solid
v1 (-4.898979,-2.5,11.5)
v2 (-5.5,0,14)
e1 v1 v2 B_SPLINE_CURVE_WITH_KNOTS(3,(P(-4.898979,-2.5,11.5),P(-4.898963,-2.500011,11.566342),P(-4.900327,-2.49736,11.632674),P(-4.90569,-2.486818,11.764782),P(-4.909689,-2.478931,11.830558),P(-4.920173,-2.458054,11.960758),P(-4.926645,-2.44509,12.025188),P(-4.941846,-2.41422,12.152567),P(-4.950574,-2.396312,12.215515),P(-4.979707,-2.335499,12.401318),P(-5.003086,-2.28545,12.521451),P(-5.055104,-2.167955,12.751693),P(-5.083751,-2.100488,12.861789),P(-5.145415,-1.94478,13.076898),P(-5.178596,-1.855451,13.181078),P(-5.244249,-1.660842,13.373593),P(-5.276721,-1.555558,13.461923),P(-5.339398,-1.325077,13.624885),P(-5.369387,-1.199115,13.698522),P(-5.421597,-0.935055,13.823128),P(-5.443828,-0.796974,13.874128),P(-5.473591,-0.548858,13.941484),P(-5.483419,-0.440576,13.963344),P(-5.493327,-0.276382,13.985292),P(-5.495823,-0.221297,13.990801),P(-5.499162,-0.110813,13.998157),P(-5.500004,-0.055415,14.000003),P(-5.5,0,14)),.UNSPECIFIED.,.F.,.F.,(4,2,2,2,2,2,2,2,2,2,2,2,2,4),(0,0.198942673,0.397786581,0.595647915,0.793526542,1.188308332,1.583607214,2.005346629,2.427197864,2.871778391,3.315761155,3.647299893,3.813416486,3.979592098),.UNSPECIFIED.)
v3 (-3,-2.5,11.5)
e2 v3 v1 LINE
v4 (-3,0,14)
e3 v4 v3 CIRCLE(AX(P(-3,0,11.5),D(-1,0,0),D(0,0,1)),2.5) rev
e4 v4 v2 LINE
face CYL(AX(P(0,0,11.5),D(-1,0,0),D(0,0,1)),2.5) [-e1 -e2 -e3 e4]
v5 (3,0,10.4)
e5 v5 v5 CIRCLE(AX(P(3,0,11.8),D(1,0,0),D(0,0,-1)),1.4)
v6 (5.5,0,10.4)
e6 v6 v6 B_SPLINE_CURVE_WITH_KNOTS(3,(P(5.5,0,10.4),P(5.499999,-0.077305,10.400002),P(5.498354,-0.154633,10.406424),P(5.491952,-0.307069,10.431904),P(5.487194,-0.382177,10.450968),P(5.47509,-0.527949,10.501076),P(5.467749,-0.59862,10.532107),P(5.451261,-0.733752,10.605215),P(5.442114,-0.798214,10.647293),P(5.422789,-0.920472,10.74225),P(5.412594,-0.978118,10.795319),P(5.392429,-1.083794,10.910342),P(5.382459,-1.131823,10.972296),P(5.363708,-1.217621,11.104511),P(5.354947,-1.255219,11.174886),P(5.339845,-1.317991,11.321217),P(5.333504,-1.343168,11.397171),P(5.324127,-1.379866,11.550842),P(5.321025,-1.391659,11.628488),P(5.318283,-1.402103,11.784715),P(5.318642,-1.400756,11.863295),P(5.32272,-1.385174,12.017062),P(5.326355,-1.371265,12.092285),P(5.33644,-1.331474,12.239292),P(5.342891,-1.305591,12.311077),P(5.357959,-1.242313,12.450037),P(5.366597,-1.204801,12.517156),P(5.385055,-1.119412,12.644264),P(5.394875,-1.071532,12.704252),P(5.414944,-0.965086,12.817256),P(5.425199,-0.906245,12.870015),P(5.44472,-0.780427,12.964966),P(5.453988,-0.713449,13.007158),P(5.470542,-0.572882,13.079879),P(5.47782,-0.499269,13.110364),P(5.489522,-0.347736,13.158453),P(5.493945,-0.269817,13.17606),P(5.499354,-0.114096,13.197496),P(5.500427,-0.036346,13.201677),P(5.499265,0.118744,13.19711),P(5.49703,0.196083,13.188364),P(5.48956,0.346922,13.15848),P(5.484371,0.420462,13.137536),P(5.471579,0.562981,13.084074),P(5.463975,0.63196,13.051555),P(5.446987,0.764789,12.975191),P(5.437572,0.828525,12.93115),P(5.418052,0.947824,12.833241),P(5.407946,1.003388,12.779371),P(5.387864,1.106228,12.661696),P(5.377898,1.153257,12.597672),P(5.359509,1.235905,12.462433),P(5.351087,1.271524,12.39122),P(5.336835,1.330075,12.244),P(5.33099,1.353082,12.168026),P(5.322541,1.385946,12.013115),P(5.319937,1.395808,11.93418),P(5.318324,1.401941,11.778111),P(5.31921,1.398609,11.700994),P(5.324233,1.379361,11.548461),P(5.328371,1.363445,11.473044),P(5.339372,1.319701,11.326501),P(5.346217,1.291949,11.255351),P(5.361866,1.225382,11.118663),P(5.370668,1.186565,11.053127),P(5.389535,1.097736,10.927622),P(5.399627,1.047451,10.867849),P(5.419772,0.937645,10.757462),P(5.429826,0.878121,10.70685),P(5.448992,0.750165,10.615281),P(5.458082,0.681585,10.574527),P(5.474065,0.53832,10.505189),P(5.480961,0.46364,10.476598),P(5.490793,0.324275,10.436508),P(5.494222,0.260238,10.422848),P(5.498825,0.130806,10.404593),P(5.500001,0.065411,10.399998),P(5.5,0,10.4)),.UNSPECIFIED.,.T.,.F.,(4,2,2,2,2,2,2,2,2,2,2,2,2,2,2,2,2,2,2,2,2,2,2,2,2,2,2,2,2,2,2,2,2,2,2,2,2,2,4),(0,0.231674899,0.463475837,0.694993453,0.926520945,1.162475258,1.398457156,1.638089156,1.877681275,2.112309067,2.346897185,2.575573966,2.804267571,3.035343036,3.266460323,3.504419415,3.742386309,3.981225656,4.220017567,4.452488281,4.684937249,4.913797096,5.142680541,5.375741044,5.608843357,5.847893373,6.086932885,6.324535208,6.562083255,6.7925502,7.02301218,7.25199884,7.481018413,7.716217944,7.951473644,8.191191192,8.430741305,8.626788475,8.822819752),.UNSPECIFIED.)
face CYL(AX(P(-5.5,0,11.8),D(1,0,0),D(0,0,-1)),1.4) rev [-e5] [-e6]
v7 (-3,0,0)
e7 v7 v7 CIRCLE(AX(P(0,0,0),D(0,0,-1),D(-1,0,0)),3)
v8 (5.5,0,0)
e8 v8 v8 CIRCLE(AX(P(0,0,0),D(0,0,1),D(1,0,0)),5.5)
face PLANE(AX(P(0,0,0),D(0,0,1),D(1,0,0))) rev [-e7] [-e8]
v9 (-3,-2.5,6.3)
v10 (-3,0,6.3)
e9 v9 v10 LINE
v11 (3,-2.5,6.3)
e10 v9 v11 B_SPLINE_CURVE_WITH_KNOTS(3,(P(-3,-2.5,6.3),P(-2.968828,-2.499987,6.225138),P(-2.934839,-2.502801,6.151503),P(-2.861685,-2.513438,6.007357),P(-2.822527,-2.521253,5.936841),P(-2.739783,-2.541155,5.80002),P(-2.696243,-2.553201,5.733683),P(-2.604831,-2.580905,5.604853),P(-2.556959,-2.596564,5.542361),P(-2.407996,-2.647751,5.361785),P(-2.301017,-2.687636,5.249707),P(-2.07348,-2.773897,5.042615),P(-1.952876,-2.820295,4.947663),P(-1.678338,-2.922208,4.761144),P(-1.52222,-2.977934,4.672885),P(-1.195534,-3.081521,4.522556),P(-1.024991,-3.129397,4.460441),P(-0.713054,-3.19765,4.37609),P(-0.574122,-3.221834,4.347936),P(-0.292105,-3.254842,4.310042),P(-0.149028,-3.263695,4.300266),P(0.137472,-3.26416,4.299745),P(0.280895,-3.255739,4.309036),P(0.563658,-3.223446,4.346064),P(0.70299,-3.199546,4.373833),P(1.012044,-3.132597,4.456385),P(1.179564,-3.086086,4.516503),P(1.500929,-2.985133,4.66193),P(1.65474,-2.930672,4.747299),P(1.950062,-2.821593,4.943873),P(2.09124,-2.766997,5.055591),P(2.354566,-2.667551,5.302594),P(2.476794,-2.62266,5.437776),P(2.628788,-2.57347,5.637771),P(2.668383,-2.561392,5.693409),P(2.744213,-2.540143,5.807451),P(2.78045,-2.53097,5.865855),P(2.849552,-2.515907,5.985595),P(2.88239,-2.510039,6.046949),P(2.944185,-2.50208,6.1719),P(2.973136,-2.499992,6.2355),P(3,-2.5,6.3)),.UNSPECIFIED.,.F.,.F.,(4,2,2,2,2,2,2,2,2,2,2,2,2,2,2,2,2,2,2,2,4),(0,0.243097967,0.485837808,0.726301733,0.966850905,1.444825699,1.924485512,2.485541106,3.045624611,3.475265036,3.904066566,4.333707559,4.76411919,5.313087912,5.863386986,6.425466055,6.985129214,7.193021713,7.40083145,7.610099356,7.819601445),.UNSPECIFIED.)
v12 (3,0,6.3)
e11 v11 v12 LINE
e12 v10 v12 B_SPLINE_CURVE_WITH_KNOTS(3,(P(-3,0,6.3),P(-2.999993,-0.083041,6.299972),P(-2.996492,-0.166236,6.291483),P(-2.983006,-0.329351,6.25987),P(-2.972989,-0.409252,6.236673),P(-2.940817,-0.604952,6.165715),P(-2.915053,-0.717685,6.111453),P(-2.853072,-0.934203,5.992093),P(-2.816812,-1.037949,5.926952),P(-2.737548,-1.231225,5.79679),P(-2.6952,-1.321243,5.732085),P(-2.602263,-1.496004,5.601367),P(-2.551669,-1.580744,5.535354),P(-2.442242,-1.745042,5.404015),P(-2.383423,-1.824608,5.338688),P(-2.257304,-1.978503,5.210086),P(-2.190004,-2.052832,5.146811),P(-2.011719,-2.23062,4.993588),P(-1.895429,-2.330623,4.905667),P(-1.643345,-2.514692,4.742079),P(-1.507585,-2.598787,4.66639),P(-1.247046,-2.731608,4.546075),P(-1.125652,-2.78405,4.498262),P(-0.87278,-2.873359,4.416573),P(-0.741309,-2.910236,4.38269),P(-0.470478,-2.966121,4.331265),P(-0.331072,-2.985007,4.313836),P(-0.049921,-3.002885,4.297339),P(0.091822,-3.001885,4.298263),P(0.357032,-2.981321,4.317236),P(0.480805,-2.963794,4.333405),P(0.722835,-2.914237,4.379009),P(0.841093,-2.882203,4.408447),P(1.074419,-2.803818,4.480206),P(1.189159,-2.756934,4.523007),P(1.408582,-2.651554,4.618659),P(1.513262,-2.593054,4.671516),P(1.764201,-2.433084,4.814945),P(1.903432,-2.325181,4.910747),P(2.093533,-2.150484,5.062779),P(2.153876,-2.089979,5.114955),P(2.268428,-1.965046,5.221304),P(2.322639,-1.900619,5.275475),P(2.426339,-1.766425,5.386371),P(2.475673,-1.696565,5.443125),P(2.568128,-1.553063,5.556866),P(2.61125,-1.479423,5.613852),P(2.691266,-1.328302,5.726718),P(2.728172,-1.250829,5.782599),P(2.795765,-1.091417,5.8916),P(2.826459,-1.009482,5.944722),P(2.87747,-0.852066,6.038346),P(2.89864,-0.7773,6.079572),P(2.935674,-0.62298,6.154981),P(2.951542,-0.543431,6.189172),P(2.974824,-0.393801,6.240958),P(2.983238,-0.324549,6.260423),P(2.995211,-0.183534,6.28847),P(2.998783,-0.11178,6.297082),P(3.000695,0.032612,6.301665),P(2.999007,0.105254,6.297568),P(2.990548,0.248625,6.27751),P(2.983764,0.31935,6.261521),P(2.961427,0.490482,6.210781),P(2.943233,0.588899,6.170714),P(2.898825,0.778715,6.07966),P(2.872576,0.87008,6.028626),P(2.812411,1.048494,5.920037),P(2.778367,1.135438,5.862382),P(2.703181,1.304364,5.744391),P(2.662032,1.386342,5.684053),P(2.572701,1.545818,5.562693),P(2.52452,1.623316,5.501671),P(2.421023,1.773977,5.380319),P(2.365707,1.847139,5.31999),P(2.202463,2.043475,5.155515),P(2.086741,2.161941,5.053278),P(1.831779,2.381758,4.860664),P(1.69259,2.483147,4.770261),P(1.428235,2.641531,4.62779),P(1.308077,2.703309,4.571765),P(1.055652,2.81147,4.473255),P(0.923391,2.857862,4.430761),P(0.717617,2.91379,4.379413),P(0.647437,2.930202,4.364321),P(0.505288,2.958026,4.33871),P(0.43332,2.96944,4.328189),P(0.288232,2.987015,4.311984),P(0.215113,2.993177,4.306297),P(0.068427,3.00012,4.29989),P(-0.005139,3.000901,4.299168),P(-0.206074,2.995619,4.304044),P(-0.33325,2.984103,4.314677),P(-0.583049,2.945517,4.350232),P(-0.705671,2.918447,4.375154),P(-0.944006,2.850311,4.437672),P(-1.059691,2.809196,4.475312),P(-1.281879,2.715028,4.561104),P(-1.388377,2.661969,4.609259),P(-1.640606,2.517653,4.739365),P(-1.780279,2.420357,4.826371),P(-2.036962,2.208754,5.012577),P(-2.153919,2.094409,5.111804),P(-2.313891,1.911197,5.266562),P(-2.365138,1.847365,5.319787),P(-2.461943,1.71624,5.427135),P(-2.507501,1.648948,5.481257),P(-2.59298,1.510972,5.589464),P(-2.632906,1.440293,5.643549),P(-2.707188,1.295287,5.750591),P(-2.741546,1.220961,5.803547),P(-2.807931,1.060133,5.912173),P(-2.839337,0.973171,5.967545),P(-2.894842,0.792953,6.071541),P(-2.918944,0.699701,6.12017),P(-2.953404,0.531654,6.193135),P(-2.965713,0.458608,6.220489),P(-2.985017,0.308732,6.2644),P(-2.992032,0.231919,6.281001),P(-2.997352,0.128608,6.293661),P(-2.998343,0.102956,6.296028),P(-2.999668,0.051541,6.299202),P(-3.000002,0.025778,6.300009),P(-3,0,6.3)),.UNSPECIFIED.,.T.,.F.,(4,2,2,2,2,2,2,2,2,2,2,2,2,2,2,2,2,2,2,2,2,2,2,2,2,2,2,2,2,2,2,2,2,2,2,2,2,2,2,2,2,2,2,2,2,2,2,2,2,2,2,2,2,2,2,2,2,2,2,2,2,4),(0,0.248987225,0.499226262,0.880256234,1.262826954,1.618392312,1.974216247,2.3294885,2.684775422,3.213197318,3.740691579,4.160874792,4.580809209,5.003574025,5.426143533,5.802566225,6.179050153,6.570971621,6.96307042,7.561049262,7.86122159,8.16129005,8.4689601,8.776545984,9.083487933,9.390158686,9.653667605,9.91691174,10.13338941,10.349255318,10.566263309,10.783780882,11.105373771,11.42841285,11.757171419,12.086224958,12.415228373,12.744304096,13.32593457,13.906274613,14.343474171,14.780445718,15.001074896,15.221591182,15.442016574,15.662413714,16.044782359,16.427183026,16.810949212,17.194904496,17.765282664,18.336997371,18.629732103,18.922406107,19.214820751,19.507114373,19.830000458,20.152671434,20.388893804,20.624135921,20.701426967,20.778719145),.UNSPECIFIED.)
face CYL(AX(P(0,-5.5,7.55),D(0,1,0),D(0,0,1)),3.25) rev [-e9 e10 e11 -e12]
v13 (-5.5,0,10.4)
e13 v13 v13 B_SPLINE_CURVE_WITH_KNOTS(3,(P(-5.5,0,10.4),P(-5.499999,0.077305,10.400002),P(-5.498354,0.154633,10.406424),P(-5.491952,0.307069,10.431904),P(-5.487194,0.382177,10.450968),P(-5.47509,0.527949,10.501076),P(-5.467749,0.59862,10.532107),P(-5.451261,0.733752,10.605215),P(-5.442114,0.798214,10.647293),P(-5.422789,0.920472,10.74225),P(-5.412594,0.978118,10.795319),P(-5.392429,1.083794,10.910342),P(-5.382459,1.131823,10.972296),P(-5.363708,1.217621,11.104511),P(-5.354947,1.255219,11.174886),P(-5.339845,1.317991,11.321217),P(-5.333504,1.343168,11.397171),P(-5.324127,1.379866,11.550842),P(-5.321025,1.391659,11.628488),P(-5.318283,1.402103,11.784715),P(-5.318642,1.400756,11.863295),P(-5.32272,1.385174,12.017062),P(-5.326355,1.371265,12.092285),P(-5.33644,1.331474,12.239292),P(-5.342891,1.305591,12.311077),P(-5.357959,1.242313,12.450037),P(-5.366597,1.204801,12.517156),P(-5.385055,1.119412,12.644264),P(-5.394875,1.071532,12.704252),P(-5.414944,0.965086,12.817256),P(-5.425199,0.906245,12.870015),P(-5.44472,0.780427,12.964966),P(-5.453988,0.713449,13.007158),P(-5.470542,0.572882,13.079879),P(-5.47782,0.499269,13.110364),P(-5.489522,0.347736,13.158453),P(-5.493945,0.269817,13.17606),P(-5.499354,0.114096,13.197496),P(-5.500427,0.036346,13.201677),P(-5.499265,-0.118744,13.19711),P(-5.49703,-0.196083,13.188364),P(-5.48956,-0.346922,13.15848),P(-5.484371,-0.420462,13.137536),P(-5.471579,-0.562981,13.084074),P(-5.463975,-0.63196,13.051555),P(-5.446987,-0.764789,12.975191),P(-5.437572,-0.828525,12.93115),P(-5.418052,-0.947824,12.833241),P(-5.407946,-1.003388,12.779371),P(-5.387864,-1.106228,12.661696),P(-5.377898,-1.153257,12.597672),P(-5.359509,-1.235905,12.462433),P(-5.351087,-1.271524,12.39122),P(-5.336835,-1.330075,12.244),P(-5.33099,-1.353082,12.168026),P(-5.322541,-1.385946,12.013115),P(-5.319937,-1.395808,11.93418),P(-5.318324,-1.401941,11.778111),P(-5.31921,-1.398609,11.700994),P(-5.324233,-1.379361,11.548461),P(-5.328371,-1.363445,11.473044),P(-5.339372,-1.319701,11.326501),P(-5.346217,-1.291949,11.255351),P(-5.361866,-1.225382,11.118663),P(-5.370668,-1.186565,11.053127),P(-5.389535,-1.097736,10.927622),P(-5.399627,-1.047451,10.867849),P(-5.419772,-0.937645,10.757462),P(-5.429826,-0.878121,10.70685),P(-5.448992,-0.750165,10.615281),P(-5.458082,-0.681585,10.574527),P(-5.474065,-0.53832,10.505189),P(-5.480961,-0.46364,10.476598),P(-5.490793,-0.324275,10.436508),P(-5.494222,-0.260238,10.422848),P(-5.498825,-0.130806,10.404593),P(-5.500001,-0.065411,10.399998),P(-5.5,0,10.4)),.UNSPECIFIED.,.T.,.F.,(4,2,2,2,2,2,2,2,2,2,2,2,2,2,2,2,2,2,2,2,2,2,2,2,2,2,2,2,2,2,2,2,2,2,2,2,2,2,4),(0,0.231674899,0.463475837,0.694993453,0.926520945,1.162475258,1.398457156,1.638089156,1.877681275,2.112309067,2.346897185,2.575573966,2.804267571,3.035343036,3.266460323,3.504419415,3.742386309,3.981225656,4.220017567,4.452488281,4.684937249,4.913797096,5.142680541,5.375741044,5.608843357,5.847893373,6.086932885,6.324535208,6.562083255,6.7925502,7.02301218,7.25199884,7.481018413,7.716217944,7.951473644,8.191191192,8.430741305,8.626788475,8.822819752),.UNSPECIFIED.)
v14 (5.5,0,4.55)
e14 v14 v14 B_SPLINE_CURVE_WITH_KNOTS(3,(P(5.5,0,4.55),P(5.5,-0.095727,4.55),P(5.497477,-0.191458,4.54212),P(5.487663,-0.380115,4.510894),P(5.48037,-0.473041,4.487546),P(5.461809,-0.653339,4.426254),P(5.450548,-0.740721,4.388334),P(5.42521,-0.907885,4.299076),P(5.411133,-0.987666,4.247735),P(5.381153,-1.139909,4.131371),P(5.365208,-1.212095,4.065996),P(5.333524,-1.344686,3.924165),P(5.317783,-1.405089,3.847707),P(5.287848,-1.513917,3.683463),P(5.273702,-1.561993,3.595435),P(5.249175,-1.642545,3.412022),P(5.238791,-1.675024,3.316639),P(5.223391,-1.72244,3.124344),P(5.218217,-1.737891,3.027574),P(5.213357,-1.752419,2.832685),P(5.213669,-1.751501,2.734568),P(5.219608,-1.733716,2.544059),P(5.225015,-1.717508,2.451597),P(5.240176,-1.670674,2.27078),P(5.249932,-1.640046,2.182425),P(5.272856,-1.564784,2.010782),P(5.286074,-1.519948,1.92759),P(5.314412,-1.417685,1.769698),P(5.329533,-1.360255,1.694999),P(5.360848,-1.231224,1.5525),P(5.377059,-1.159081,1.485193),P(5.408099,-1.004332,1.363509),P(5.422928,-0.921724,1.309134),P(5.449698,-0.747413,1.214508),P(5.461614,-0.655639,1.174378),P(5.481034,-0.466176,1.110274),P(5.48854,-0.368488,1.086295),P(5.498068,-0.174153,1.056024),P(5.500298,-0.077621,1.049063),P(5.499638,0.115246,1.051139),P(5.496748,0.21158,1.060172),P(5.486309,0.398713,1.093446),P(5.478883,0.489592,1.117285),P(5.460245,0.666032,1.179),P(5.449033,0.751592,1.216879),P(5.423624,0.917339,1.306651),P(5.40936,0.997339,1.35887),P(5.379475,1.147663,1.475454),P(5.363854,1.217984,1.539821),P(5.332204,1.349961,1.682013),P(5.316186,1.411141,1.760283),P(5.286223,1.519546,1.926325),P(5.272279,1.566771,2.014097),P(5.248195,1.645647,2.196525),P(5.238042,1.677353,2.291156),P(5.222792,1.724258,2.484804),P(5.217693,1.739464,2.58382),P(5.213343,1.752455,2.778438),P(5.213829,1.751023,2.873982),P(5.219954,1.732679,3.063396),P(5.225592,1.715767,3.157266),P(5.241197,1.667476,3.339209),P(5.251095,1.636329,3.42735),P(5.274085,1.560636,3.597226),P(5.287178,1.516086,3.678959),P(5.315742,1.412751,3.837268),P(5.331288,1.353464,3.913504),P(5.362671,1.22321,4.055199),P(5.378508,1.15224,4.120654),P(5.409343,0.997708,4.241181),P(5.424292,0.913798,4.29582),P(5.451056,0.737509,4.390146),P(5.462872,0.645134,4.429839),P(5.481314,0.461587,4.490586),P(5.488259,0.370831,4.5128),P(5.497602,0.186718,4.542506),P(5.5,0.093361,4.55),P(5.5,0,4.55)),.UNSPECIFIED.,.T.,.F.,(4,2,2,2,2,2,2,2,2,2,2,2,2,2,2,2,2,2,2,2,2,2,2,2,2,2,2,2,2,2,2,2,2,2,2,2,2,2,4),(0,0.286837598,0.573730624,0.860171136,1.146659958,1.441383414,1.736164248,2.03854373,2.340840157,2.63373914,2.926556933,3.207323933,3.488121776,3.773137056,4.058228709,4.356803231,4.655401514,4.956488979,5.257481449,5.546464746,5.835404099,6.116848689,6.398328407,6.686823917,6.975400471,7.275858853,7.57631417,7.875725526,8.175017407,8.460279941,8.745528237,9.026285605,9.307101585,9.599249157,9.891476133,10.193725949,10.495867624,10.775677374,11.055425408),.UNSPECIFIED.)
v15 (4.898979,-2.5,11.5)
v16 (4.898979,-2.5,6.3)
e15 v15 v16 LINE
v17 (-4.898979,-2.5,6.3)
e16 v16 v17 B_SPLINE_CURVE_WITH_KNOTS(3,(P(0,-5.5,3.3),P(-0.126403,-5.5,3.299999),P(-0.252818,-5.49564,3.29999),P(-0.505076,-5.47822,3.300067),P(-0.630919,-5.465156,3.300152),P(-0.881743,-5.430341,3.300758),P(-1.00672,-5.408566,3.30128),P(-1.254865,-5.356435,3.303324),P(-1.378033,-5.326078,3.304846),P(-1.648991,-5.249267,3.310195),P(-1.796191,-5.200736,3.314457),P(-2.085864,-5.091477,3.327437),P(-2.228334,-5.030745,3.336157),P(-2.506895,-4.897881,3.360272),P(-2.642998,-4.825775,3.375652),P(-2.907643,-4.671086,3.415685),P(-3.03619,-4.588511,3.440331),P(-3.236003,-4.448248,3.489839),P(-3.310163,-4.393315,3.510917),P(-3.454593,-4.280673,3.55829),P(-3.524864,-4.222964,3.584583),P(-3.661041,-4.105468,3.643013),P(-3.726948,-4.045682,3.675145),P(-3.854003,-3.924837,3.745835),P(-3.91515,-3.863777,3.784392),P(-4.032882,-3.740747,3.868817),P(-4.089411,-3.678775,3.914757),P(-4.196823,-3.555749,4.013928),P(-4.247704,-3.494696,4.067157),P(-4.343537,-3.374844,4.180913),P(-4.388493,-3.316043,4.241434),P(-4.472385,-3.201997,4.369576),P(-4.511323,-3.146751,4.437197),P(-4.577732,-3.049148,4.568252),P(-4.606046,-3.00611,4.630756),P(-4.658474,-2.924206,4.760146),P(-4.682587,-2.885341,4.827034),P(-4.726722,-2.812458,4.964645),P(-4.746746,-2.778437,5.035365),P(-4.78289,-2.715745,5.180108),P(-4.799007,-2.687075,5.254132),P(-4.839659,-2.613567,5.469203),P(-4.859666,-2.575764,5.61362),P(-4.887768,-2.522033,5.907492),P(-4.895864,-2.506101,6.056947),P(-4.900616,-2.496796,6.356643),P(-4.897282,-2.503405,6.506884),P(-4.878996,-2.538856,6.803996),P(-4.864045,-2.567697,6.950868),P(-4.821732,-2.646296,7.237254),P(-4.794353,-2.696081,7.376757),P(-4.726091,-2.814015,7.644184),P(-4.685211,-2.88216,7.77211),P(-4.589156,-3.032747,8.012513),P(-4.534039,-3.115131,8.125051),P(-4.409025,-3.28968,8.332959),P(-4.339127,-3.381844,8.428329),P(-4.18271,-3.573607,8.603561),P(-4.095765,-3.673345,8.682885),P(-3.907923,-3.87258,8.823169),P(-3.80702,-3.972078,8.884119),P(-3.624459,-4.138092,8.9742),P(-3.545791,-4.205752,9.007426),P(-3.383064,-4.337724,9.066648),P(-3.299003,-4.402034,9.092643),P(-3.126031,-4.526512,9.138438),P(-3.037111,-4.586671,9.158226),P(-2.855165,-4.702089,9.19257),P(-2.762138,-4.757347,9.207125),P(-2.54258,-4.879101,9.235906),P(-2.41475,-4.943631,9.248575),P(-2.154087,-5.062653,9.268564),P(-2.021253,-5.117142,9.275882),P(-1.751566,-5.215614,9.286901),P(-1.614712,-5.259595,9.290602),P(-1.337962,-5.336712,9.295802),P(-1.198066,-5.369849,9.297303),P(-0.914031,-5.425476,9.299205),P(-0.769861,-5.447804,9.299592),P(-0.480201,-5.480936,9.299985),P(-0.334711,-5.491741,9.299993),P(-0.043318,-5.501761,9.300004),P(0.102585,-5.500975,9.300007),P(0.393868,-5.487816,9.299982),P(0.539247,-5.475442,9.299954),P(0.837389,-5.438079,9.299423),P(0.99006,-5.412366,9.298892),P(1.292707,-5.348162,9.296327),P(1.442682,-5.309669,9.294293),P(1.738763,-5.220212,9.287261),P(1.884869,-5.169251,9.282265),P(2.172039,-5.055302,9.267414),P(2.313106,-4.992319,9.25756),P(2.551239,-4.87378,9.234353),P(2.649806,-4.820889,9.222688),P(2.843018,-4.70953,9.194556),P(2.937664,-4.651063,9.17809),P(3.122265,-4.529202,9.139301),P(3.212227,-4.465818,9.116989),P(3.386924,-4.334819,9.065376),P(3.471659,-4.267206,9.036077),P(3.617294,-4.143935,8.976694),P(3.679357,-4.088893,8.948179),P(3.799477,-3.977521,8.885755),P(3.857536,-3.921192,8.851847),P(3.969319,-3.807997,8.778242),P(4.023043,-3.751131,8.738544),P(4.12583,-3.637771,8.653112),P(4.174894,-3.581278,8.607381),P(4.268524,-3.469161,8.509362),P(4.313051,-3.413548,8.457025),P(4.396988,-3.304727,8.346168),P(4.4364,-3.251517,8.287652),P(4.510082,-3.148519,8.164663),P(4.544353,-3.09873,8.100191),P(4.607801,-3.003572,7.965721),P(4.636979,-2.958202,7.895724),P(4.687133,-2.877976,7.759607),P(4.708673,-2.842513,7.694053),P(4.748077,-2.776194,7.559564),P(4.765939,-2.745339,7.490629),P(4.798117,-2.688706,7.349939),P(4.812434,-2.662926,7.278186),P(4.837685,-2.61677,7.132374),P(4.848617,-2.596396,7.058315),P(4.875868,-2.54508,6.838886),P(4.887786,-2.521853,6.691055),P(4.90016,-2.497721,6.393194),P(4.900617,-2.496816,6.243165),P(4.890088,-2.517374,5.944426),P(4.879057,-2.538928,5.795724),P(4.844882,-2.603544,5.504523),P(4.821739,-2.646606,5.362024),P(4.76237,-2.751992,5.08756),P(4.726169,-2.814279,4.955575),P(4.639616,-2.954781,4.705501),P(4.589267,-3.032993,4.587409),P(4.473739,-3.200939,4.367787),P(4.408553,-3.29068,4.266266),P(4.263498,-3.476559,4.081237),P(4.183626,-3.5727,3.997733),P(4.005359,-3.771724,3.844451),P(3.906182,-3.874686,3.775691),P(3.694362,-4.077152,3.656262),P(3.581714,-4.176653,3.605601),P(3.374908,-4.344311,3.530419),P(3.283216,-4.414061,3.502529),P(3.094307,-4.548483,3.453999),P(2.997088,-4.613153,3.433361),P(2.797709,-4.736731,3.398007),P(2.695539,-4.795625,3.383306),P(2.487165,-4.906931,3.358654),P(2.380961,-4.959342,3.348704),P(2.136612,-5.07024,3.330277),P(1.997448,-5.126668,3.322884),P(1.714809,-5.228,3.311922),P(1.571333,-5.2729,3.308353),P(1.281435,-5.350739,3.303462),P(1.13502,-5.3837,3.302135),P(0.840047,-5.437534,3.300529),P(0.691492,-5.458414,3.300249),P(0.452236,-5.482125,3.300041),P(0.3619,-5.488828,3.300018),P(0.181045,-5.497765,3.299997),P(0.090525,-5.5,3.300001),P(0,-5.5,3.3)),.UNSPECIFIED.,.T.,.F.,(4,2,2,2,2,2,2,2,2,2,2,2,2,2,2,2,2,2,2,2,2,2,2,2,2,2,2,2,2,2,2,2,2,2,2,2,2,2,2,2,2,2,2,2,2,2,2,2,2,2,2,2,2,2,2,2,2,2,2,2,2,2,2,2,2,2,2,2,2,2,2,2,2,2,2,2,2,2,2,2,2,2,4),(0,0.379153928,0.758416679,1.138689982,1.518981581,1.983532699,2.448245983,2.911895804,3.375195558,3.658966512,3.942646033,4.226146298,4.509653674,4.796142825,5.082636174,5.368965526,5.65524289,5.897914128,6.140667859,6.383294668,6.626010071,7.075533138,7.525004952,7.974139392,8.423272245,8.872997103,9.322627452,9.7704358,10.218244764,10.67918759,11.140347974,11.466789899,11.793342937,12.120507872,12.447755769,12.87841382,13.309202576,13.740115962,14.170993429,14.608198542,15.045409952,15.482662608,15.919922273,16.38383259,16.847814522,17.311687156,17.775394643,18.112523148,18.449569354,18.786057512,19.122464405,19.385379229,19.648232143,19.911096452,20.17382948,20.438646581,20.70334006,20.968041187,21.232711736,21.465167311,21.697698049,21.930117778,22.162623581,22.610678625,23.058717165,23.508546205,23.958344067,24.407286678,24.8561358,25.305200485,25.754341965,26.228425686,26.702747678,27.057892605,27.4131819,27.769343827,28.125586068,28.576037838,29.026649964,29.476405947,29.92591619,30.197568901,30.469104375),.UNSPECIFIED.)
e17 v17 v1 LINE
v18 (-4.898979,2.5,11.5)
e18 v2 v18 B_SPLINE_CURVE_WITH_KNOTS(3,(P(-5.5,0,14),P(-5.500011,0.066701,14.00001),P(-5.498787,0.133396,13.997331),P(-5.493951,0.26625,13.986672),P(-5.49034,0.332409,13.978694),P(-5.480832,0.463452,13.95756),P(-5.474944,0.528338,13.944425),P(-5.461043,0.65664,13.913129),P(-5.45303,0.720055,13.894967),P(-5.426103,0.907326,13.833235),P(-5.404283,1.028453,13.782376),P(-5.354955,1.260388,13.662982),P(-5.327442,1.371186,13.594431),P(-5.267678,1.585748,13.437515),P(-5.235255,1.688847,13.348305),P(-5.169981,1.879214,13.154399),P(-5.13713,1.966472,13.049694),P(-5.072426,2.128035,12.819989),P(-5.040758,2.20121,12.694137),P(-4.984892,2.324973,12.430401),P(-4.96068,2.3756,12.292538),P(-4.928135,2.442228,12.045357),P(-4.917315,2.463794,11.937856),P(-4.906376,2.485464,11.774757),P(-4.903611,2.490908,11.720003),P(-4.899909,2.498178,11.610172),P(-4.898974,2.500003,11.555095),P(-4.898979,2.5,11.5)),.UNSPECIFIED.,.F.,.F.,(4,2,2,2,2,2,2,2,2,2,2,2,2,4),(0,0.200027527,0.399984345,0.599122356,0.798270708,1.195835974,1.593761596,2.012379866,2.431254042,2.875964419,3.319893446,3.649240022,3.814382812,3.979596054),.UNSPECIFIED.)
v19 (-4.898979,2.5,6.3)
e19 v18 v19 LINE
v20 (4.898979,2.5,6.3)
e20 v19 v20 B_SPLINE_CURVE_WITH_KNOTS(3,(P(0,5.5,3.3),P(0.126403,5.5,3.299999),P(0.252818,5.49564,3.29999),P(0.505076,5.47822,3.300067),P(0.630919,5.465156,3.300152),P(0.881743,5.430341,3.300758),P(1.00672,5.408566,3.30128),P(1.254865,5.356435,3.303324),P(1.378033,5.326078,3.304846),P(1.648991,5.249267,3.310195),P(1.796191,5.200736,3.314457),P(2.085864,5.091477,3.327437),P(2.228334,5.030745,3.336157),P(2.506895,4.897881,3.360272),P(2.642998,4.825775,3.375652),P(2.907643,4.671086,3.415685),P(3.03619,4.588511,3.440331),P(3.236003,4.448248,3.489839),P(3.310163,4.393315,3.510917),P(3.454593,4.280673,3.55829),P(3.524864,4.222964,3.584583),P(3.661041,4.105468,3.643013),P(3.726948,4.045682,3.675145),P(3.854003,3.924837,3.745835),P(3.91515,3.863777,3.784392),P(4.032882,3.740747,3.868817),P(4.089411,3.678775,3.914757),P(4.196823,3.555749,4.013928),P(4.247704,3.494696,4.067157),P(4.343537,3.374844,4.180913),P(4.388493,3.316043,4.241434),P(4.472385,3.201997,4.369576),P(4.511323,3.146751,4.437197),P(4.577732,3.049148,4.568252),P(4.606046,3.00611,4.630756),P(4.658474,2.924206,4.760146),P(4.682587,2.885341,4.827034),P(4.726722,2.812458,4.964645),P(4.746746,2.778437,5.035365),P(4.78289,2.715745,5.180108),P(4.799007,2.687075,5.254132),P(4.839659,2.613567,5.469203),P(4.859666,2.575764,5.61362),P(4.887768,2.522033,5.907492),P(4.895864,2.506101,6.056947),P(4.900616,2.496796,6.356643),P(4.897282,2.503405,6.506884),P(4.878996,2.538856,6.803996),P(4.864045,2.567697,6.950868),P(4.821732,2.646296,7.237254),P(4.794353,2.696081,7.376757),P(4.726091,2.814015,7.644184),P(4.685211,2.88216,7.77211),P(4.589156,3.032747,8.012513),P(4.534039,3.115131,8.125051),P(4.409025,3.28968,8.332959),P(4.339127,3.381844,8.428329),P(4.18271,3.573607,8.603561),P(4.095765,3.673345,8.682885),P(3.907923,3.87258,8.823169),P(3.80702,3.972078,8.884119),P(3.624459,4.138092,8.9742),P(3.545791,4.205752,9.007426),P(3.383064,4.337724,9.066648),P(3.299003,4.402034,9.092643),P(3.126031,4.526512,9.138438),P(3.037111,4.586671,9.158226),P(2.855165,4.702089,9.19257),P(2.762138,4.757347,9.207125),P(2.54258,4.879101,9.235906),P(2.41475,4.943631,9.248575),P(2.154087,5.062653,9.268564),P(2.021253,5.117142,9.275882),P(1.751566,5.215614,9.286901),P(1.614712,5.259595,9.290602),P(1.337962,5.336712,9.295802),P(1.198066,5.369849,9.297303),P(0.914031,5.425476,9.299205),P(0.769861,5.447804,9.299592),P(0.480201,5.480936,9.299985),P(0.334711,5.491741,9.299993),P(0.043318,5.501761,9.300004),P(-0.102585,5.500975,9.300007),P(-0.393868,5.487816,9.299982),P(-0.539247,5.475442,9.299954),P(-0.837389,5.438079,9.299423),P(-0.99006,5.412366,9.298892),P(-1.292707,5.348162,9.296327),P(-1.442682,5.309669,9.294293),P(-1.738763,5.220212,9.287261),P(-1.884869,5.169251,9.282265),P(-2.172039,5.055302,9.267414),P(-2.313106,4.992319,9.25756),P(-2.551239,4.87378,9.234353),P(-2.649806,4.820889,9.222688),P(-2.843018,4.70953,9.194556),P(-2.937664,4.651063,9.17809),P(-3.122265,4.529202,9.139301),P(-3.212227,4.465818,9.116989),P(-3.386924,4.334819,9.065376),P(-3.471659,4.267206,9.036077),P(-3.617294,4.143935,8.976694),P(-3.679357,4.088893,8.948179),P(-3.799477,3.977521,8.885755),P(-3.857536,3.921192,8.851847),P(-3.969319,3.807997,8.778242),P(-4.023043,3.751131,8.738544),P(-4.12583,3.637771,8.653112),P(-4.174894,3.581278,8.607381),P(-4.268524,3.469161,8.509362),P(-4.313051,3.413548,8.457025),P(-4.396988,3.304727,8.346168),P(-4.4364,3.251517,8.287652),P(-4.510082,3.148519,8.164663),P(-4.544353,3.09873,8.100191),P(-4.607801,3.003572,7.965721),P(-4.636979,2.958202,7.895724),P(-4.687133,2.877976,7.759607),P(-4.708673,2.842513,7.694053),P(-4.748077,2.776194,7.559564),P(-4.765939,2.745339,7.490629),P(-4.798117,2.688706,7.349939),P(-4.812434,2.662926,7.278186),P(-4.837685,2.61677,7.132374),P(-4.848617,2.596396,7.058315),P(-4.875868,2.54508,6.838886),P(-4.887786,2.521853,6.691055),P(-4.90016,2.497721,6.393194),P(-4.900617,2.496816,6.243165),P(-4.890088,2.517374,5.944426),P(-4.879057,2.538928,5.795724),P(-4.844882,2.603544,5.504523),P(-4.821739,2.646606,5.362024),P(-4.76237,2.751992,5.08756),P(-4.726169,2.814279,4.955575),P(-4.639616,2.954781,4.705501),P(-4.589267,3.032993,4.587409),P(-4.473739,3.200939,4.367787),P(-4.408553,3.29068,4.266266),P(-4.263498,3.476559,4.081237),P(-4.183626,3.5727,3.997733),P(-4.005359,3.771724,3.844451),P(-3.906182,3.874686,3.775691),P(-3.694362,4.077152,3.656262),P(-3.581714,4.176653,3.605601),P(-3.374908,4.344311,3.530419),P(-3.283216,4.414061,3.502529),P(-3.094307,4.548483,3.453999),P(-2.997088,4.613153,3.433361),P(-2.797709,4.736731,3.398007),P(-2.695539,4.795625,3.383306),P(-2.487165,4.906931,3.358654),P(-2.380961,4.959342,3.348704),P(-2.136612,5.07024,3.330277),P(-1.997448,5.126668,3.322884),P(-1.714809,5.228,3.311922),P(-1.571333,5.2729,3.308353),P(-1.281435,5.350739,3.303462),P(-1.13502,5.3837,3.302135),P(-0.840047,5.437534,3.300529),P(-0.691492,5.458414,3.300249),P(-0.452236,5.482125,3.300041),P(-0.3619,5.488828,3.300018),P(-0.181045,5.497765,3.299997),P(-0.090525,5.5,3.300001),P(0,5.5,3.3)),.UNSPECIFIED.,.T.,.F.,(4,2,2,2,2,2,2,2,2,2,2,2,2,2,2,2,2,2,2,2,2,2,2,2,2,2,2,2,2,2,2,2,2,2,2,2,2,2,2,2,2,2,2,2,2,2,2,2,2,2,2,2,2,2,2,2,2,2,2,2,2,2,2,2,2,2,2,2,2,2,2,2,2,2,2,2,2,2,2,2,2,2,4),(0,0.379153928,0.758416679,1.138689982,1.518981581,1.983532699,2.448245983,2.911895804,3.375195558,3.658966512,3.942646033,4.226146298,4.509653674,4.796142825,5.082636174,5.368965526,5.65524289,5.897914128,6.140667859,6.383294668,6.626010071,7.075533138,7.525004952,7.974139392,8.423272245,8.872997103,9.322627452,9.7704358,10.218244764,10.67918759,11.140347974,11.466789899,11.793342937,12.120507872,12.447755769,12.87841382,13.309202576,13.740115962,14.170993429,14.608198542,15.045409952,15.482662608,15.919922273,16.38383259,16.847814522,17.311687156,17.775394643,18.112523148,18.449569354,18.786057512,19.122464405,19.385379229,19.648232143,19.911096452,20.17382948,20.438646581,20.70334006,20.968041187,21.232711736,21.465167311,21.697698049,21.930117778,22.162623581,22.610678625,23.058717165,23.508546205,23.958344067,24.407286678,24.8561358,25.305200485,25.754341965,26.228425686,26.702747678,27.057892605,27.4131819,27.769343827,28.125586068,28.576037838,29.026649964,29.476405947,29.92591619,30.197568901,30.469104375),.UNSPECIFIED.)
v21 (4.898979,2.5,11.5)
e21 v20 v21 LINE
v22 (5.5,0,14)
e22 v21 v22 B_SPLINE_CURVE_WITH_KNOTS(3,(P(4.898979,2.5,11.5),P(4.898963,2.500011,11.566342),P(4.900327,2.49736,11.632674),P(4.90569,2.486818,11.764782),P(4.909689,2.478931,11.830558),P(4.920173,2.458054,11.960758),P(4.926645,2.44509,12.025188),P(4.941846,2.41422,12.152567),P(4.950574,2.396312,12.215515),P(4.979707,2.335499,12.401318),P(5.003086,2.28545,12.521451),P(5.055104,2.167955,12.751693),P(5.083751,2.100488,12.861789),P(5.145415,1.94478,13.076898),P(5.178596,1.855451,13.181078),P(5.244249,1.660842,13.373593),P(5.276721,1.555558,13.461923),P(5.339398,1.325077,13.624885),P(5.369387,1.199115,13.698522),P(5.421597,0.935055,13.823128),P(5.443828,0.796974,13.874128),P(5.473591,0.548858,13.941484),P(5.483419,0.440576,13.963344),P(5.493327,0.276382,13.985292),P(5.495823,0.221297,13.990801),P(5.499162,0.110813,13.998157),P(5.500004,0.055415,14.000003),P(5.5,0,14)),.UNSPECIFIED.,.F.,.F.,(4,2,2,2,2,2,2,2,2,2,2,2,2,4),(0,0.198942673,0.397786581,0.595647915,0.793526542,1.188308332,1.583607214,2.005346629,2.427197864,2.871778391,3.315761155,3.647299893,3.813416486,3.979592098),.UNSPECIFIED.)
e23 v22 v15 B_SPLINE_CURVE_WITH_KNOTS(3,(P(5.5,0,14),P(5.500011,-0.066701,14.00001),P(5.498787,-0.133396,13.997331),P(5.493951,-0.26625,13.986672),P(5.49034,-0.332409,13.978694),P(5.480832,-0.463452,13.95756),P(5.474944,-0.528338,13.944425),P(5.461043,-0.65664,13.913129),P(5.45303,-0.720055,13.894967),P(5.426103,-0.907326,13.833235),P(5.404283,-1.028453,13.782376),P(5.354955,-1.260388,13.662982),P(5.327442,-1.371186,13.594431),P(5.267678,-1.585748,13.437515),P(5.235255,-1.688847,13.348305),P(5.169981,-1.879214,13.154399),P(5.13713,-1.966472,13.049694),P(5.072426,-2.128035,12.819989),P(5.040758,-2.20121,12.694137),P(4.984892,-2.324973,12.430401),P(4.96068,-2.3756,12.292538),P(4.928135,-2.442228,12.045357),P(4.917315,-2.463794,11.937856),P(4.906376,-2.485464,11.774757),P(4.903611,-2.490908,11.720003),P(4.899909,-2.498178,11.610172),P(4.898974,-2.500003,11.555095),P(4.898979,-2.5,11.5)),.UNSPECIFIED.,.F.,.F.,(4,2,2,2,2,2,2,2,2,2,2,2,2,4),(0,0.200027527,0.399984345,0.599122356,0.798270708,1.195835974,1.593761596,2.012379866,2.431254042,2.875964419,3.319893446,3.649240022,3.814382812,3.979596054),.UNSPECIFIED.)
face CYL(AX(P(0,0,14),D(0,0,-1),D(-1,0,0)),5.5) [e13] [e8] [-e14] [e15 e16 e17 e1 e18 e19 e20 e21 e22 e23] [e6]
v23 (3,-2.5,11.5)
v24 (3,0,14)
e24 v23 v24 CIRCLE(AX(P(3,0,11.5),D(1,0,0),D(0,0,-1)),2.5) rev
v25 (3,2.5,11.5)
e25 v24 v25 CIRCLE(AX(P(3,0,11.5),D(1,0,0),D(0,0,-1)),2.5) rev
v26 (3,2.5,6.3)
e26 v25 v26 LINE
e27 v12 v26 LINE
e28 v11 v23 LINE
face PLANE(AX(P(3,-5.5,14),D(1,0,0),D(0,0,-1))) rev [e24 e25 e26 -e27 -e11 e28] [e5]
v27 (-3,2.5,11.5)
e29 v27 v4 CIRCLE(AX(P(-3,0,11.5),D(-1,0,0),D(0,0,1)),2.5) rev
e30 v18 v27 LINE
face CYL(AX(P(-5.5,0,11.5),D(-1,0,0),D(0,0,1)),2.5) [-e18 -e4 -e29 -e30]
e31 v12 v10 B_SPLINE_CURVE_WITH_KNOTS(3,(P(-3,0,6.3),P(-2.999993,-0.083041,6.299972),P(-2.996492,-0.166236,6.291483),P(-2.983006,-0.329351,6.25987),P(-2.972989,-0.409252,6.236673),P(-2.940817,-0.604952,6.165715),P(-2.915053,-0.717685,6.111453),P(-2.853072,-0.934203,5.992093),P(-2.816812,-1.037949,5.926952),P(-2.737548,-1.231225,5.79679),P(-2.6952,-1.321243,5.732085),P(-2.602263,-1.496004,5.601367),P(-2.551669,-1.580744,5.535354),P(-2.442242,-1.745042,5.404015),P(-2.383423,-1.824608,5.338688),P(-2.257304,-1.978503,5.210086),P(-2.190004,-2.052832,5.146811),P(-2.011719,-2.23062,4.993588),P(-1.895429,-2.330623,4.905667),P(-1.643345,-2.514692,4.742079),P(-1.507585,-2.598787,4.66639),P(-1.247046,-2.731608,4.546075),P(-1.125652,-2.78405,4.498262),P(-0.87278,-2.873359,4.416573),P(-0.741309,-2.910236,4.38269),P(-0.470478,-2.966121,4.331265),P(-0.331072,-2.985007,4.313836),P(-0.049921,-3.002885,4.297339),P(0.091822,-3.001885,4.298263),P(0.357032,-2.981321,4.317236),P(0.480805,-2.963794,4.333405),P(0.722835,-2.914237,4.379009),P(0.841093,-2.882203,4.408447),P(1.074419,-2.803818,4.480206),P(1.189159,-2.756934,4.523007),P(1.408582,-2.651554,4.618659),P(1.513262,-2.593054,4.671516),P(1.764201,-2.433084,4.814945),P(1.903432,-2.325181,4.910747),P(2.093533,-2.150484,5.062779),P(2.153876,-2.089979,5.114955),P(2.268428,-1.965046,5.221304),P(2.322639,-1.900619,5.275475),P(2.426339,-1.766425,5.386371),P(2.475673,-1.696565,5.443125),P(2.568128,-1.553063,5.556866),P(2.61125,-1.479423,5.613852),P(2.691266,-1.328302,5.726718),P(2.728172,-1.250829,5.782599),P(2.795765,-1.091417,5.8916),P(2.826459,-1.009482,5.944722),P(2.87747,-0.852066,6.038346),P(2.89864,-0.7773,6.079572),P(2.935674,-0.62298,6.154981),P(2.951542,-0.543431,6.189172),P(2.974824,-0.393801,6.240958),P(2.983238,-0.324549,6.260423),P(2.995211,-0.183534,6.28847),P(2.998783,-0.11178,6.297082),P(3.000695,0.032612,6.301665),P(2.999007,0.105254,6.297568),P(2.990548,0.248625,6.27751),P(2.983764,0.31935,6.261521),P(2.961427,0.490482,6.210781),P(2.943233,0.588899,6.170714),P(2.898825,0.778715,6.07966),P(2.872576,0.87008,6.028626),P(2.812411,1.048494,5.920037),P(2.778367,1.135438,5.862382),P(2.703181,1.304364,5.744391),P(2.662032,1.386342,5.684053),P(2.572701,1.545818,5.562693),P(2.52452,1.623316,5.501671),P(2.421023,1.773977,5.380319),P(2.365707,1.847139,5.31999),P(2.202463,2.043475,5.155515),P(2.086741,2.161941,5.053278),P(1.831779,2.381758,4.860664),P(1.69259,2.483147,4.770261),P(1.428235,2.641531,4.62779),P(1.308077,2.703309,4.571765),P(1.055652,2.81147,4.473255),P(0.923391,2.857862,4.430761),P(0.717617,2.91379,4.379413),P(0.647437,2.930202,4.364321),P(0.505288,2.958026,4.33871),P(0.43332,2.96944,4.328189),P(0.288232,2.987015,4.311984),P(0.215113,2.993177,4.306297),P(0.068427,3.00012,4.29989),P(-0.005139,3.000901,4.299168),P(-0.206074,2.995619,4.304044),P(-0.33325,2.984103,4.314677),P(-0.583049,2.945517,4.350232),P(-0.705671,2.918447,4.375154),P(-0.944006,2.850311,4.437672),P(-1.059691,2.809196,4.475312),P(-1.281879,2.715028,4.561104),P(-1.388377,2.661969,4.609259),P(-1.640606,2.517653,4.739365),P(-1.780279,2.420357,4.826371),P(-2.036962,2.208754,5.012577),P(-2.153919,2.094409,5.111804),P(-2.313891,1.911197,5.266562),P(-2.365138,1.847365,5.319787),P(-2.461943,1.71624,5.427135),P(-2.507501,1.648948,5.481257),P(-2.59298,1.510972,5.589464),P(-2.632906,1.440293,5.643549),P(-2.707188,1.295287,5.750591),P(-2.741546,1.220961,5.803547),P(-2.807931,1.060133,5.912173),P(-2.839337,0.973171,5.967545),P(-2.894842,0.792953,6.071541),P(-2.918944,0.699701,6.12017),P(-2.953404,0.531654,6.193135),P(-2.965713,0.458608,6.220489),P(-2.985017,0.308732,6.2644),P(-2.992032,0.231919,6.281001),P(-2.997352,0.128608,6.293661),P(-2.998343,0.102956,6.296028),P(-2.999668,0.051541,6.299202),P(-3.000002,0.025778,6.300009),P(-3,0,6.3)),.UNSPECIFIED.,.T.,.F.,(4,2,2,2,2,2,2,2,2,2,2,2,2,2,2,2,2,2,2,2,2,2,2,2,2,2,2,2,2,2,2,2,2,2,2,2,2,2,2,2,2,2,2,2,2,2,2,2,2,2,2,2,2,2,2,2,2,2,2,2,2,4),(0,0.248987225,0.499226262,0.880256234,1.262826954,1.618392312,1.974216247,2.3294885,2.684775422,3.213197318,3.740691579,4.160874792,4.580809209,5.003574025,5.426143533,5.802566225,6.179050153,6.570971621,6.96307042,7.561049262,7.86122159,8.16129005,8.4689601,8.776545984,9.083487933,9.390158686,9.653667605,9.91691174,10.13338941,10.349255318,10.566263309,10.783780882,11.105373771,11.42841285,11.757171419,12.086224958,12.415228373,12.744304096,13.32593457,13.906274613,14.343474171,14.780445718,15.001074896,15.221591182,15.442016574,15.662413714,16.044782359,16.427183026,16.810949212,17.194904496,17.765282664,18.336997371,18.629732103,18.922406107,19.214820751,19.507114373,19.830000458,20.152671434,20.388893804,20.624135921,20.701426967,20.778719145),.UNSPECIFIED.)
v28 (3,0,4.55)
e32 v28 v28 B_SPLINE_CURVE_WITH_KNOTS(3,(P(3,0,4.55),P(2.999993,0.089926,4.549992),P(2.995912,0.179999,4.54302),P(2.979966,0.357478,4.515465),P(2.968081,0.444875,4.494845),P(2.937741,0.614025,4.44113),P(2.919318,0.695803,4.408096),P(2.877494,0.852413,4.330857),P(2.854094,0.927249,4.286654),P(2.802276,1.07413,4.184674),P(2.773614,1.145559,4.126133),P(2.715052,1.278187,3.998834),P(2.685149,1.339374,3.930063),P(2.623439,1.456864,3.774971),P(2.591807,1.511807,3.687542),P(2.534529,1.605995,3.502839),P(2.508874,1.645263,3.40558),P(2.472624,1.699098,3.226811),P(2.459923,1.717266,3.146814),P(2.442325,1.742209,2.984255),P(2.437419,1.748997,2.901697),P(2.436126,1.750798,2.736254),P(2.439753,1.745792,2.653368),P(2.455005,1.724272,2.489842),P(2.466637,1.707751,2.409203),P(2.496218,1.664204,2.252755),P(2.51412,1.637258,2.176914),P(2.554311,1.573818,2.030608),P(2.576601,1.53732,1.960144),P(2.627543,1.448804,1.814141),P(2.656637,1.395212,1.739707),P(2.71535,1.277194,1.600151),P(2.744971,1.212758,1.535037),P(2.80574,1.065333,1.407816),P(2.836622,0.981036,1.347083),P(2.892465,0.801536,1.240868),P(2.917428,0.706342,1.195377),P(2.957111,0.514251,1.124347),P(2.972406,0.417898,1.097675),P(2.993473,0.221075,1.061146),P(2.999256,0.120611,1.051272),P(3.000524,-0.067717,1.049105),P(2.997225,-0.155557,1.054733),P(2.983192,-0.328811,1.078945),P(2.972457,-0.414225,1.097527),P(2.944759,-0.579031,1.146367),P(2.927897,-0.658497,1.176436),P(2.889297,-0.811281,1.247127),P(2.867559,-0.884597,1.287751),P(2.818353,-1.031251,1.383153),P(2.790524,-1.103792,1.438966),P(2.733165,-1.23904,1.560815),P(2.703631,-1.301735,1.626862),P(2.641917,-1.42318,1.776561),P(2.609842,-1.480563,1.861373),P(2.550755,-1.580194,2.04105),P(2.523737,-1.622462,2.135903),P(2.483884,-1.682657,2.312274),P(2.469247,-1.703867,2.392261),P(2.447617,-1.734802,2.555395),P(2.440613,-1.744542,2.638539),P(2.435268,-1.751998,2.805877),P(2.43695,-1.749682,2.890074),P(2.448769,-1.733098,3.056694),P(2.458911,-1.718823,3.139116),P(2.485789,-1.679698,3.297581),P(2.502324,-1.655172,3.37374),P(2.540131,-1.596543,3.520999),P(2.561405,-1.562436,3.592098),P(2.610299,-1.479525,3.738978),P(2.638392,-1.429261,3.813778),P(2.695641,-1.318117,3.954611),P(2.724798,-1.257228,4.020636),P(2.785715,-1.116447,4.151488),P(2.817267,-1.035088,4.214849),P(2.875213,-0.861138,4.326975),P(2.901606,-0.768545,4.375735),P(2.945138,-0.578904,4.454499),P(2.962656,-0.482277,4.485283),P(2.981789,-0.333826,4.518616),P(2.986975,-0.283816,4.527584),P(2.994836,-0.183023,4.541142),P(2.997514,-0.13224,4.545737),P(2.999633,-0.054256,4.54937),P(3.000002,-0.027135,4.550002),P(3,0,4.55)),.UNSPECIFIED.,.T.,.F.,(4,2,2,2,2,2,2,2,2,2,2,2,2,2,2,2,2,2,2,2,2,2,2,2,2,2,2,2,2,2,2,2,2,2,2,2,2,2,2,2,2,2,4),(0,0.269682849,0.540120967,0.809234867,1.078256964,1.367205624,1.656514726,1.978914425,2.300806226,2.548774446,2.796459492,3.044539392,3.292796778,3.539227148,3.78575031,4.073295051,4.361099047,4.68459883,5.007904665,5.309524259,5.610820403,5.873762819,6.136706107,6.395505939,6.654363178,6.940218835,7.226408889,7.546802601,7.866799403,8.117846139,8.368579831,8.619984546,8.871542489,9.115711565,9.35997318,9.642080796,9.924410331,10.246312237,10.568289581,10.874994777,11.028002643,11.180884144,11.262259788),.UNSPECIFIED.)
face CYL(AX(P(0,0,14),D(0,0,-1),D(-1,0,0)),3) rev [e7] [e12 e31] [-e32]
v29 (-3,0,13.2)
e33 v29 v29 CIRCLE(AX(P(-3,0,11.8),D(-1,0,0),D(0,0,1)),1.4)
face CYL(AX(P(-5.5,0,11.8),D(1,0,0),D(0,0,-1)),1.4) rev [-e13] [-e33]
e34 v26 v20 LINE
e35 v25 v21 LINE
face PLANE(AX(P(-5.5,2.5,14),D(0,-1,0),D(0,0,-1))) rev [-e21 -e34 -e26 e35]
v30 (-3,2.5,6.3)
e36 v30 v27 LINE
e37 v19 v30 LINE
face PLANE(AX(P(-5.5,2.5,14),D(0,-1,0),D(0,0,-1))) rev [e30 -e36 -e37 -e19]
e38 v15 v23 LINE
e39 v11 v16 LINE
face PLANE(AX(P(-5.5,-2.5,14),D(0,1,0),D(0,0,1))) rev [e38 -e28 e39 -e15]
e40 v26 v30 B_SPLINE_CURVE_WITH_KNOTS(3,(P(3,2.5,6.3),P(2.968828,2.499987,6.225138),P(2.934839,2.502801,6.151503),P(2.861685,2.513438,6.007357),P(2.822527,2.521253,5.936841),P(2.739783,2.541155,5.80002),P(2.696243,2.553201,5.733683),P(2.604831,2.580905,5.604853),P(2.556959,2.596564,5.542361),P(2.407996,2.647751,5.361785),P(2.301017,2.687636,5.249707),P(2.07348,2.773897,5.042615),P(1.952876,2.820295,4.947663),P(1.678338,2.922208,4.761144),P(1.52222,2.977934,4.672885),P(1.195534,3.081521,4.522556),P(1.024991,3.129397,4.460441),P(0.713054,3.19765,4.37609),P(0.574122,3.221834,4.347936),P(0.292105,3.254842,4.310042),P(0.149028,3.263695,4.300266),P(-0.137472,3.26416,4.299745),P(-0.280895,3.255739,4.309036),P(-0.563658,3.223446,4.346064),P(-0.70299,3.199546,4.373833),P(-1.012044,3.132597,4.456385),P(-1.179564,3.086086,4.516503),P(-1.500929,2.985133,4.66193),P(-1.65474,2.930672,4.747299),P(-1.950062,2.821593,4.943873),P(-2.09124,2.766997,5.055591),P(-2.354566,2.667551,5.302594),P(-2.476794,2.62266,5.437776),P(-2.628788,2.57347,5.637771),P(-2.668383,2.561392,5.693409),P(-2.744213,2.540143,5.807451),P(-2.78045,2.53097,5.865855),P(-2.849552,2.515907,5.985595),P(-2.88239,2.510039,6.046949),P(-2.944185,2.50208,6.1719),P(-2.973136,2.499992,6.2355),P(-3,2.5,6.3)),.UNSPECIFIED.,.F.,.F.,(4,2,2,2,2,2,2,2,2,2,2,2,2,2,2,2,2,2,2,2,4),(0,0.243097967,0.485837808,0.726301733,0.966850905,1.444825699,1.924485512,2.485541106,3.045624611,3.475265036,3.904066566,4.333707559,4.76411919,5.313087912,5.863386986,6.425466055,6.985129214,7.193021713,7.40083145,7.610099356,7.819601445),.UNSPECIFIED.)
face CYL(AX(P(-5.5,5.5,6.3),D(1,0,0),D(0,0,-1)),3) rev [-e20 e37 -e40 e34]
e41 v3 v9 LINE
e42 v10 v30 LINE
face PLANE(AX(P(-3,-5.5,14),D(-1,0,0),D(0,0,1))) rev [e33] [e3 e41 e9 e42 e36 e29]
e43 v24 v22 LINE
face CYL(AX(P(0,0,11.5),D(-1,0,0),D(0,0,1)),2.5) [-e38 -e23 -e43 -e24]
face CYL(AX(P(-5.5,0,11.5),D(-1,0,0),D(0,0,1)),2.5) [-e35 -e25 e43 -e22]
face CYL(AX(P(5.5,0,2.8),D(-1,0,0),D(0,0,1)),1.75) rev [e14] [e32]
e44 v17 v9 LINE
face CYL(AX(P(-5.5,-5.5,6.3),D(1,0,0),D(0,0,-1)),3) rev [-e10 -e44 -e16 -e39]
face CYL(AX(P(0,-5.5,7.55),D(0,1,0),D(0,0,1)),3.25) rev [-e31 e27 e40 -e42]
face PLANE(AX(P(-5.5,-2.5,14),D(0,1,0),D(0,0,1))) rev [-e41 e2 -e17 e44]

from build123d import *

# Parameters (mm, degrees)
SKETCH_1_R               = 5.5
EXTRUDE_1_DEPTH          = 14
SKETCH_2_R               = 3
CUT_EXTRUDE_1_DEPTH      = 17.015617378
CUT_EXTRUDE_2_DEPTH      = 17.015617378
CUT_EXTRUDE_2_DEPTH_BACK = 17.015617378
CUT_EXTRUDE_3_DEPTH      = 17.015617534
CUT_EXTRUDE_3_DEPTH_BACK = 17.015617534
FILLET_1_R               = 2.5
SKETCH_5_R               = 1.75
CUT_EXTRUDE_4_DEPTH      = 17.015617534
CUT_EXTRUDE_5_DEPTH      = 17.015617534
CUT_EXTRUDE_5_DEPTH_BACK = 17.015617534
SKETCH_6_R               = 1.4


with BuildPart() as part:
    # 草图1 → 凸台-拉伸1 (new body)
    with BuildSketch(Plane.XY):
        Circle(SKETCH_1_R)
    extrude(amount=EXTRUDE_1_DEPTH)

    # 草图2 → 切除-拉伸1 (cut, through all)
    with BuildSketch(Plane(origin=(0, 0, 0), x_dir=(-1, 0, 0), z_dir=(0, 0, -1))):
        Circle(SKETCH_2_R)
    extrude(amount=-CUT_EXTRUDE_1_DEPTH, mode=Mode.SUBTRACT)

    # 草图3 → 切除-拉伸2 (cut, two sides: drawn at the far end of the back side and taken through both)
    with BuildSketch(Plane(origin=(0, 0, 0), x_dir=(1, 0, 0), z_dir=(0, 1, 0)).offset(-CUT_EXTRUDE_2_DEPTH_BACK)):
        with BuildLine():
            Line((-3, -14), (3, -14))
            Line((3, -14), (3, -6.3))
            ThreePointArc((3, -6.3), (0, -4.3), (-3, -6.3))
            Line((-3, -6.3), (-3, -14))
        make_face()
    extrude(amount=CUT_EXTRUDE_2_DEPTH + CUT_EXTRUDE_2_DEPTH_BACK, mode=Mode.SUBTRACT)

    # 草图4 → 切除-拉伸3 (cut, two sides: drawn at the far end of the back side and taken through both)
    with BuildSketch(Plane(origin=(0, 0, 0), x_dir=(0, 0, -1), z_dir=(1, 0, 0)).offset(-CUT_EXTRUDE_3_DEPTH_BACK)):
        with BuildLine():
            Line((-14, 2.5), (-6.3, 2.5))
            ThreePointArc((-6.3, 2.5), (-4.003021048, 3.570262273), (-3.344955373, 6.017408205))
            Line((-3.344955373, 6.017408205), (-3.344955373, 8.923023013))
            Line((-3.344955373, 8.923023013), (-14, 8.923023013))
            Line((-14, 8.923023013), (-14, 2.5))
        make_face()
        with BuildLine():
            Line((-14, -2.5), (-6.3, -2.5))
            ThreePointArc((-6.3, -2.5), (-3.674156249, -4.049157281), (-3.760209141, -7.096703602))
            Line((-3.760209141, -7.096703602), (-6.538750291, -8.043650362))
            Line((-6.538750291, -8.043650362), (-14, -8.043650362))
            Line((-14, -8.043650362), (-14, -2.5))
        make_face()
    extrude(amount=CUT_EXTRUDE_3_DEPTH + CUT_EXTRUDE_3_DEPTH_BACK, mode=Mode.SUBTRACT)

    # 圆角1
    fillet_1_edges = [part.edges().sort_by_distance(p)[0] for p in [
        (-3.949489743, -2.5, 14),
        (-3.949489743, 2.5, 14),
        (3.949489743, 2.5, 14),
        (3.949489743, -2.5, 14),
    ]]
    fillet(fillet_1_edges, radius=FILLET_1_R - 0.0001)  # a hair under: the kernel refuses the full size

    # 草图5 → 切除-拉伸4 (cut, through all)
    with BuildSketch(Plane(origin=(0, 0, 0), x_dir=(0, 0, -1), z_dir=(1, 0, 0))):
        with Locations(Location((-2.8, 0, 0), (0, 0, 180))):
            Circle(SKETCH_5_R)
    extrude(amount=CUT_EXTRUDE_4_DEPTH, mode=Mode.SUBTRACT)

    # 草图6 → 切除-拉伸5 (cut, two sides: drawn at the far end of the back side and taken through both)
    with BuildSketch(Plane(origin=(0, 0, 0), x_dir=(0, 0, -1), z_dir=(1, 0, 0)).offset(-CUT_EXTRUDE_5_DEPTH_BACK)):
        with Locations((-11.8, 0)):
            Circle(SKETCH_6_R)
    extrude(amount=CUT_EXTRUDE_5_DEPTH + CUT_EXTRUDE_5_DEPTH_BACK, mode=Mode.SUBTRACT)


solid = part.part
